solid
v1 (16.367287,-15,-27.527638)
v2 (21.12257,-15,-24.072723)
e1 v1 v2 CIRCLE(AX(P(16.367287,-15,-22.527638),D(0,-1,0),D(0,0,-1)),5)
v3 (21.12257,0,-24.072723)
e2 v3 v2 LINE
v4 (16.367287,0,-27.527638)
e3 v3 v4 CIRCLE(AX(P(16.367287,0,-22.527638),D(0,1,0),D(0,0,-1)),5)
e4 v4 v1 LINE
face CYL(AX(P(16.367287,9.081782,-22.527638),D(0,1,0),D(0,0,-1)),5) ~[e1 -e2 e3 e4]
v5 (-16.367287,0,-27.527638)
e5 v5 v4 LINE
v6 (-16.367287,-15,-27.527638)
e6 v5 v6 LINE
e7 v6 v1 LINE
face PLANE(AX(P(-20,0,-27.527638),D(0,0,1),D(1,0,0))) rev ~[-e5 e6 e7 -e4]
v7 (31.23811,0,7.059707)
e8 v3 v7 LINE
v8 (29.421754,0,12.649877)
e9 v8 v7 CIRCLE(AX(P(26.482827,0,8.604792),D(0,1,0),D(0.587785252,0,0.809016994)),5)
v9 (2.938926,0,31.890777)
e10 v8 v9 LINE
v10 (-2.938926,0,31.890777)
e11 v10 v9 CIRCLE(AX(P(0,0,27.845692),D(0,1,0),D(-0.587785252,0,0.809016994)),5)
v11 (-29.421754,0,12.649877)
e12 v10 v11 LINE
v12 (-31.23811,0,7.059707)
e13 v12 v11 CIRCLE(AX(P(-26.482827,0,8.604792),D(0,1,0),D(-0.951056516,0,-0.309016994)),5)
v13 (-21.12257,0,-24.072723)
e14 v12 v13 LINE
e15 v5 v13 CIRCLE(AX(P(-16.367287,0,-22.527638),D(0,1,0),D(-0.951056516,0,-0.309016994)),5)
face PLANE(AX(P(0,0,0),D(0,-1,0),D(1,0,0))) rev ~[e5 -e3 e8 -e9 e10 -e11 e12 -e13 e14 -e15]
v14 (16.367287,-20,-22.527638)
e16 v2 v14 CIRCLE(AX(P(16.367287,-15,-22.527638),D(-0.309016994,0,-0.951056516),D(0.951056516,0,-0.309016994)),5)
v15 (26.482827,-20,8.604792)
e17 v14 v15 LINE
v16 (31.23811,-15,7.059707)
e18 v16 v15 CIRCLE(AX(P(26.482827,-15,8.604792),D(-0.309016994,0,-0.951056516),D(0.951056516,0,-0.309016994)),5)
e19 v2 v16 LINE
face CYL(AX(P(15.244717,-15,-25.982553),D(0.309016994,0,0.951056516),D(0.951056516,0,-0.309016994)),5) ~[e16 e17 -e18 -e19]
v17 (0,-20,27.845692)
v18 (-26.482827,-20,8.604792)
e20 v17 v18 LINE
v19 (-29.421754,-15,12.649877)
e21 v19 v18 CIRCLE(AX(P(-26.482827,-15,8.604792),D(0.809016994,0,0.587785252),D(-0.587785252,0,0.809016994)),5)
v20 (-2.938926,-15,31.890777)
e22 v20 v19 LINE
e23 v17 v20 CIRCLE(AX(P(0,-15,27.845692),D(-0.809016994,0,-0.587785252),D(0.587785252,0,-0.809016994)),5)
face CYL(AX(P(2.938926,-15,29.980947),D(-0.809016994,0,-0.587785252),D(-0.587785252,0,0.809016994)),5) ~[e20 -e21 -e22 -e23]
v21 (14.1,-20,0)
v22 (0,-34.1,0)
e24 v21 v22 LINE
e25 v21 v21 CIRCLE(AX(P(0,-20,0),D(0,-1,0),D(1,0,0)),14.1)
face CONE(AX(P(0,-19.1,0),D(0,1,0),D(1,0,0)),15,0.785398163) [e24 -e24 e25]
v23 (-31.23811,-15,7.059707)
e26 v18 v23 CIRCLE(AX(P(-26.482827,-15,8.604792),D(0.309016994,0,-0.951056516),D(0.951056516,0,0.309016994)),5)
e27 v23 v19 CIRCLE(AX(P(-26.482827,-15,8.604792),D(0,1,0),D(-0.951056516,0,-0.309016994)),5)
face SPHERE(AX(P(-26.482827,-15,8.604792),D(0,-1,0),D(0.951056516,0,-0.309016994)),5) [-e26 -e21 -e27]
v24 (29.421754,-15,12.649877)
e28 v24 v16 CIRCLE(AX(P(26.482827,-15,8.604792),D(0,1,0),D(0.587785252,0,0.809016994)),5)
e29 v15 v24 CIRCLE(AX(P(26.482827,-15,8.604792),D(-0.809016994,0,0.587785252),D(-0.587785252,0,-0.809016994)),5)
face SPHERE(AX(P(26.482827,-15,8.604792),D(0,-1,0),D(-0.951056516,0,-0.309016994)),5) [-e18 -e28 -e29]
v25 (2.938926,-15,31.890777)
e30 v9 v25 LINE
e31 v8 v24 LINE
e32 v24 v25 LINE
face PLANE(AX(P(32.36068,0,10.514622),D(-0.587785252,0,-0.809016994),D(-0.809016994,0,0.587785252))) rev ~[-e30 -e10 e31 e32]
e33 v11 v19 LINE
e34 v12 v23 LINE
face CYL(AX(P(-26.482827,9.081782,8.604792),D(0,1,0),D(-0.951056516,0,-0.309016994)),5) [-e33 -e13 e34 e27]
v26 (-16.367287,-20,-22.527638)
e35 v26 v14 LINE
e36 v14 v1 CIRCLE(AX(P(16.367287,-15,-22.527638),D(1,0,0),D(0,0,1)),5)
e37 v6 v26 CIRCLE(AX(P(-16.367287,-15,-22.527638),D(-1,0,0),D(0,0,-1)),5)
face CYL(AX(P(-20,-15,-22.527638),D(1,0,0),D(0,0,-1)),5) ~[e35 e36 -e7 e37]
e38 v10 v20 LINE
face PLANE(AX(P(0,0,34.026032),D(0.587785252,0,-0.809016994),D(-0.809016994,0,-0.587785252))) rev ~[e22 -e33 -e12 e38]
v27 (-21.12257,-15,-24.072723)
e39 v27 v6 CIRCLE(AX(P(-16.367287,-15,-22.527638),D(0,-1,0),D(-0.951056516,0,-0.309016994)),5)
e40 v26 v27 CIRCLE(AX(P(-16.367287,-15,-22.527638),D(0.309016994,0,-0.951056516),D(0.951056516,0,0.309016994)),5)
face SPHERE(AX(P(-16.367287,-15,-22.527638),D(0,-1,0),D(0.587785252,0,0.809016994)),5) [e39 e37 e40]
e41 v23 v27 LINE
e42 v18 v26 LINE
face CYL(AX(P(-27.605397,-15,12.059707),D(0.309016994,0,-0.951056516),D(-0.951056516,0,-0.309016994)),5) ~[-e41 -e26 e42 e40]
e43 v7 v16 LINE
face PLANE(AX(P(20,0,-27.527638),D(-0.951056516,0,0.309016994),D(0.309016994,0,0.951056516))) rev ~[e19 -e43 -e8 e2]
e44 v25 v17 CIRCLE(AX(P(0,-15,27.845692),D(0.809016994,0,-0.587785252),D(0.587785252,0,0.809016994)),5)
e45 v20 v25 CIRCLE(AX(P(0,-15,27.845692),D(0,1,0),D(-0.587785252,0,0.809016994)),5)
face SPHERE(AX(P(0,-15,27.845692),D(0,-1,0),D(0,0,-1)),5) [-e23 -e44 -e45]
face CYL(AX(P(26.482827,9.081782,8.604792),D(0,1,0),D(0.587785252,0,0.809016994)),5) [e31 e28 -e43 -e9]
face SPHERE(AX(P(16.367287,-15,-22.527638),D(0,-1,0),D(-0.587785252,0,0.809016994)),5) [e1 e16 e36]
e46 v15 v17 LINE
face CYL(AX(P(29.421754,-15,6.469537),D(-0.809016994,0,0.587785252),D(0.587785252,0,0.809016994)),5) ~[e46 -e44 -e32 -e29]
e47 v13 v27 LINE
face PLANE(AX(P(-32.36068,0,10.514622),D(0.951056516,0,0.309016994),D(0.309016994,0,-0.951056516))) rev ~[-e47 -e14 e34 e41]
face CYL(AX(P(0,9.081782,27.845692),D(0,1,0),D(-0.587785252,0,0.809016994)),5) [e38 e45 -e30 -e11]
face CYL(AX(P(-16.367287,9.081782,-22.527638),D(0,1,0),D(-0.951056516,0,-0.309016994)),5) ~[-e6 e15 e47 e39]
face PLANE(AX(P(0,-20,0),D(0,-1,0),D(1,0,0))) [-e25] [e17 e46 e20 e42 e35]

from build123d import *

# Parameters (mm, degrees)
F0_R         = 15
F1_DEPTH     = 20
F2_R         = 5
F3_T1_DEPTH  = 24.0817816001
F3_T6_DEPTH  = 5
F3_T12_DEPTH = 5
F3_T18_DEPTH = 5
F3_T24_DEPTH = 5
F3_T30_DEPTH = 5
F4_DEPTH     = 34.1


# Not quite as in the source:
# - a fillet or chamfer that OpenCascade refuses, or shapes differently, is made with other operations: its cross-section is extruded or revolved along the edge and cut away or added


with BuildPart() as f1:
    # F0 (on Front) → F1 (new body)
    with BuildSketch(Plane.XZ):
        Polygon((-20, -27.5276384094), (20, -27.5276384094), (32.360679775, 10.5146222424), (0, 34.0260323341), (-32.360679775, 10.5146222424), align=None)
        Circle(F0_R, mode=Mode.SUBTRACT)
    extrude(amount=F1_DEPTH)

    # F2
    f2_edges = [f1.edges().sort_by_distance(p)[0] for p in [
        (-26.18034, -20, -8.506508),
        (0, -20, -27.527638),
        (26.18034, -20, -8.506508),
        (16.18034, -20, 22.270327),
        (-16.18034, -20, 22.270327),
    ]]
    fillet(f2_edges, radius=F2_R)

    # F3: fillet of radius 5 on 5 edges, made by hand

    # F3_s2 → F3_t1 (cut)
    with BuildSketch(Plane.XZ.offset(-9.0817816001)):
        with BuildLine():
            ThreePointArc((16.36728736, -27.5276384094), (19.3062136214, -26.5727233813), (21.1225699414, -24.0727233813))
            Line((21.1225699414, -24.0727233813), (20, -27.5276384094))
            Line((20, -27.5276384094), (16.36728736, -27.5276384094))
        make_face()
        with BuildLine():
            ThreePointArc((29.4217535135, 12.649877158), (31.2381098335, 10.149877158), (31.2381098335, 7.0597072143))
            Line((31.2381098335, 7.0597072143), (32.360679775, 10.5146222424))
            Line((32.360679775, 10.5146222424), (29.4217535135, 12.649877158))
        make_face()
        with BuildLine():
            ThreePointArc((-2.9389262615, 31.8907774185), (0, 32.8456924466), (2.9389262615, 31.8907774185))
            Line((2.9389262615, 31.8907774185), (0, 34.0260323341))
            Line((0, 34.0260323341), (-2.9389262615, 31.8907774185))
        make_face()
        with BuildLine():
            ThreePointArc((-31.2381098335, 7.0597072143), (-31.2381098335, 10.149877158), (-29.4217535135, 12.649877158))
            Line((-29.4217535135, 12.649877158), (-32.360679775, 10.5146222424))
            Line((-32.360679775, 10.5146222424), (-31.2381098335, 7.0597072143))
        make_face()
        with BuildLine():
            ThreePointArc((-21.1225699414, -24.0727233813), (-19.3062136214, -26.5727233813), (-16.36728736, -27.5276384094))
            Line((-16.36728736, -27.5276384094), (-20, -27.5276384094))
            Line((-20, -27.5276384094), (-21.1225699414, -24.0727233813))
        make_face()
    extrude(amount=F3_T1_DEPTH, mode=Mode.SUBTRACT)


with BuildPart() as f3_tool4:
    # F3_s5 → F3_t6 (new body)
    with BuildSketch(Plane.XZ.offset(15)):
        Polygon((-16.36728736, -22.5276384094), (-21.1225699414, -24.0727233813), (-20, -27.5276384094), (-16.36728736, -27.5276384094), align=None)
    extrude(amount=F3_T6_DEPTH)

    # F3_s7 → F3_t8 (revolve, cut)
    with BuildSketch(Plane(origin=(-16.36728736, -15, -22.5276384094), x_dir=(0.5877852523, 0, 0.8090169944), z_dir=(0.8090169944, 0, -0.5877852523))):
        with BuildLine():
            ThreePointArc((0, -5), (5, 0), (0, 5))
            Line((0, 5), (0, -5))
        make_face()
    revolve(axis=Axis((-16.36728736, -15, -22.5276384094), (0, -1, 0)), mode=Mode.SUBTRACT)


with BuildPart() as f1_1:
    add(f1.part)

    # F3_t3: cut F3_tool4
    add(f3_tool4.part, mode=Mode.SUBTRACT)


with BuildPart() as f3_tool10:
    # F3_s11 → F3_t12 (new body)
    with BuildSketch(Plane.XZ.offset(15)):
        Polygon((-26.4828272521, 8.6047921861), (-31.2381098335, 7.0597072143), (-32.360679775, 10.5146222424), (-29.4217535135, 12.649877158), align=None)
    extrude(amount=F3_T12_DEPTH)

    # F3_s13 → F3_t14 (revolve, cut)
    with BuildSketch(Plane(origin=(-26.4828272521, -15, 8.6047921861), x_dir=(0.9510565163, 0, -0.3090169944), z_dir=(-0.3090169944, 0, -0.9510565163))):
        with BuildLine():
            ThreePointArc((0, -5), (5, 0), (0, 5))
            Line((0, 5), (0, -5))
        make_face()
    revolve(axis=Axis((-26.4828272521, -15, 8.6047921861), (0, -1, 0)), mode=Mode.SUBTRACT)


with BuildPart() as f1_2:
    add(f1_1.part)

    # F3_t9: cut F3_tool10
    add(f3_tool10.part, mode=Mode.SUBTRACT)


with BuildPart() as f3_tool16:
    # F3_s17 → F3_t18 (new body)
    with BuildSketch(Plane.XZ.offset(15)):
        Polygon((0, 27.8456924466), (-2.9389262615, 31.8907774185), (0, 34.0260323341), (2.9389262615, 31.8907774185), align=None)
    extrude(amount=F3_T18_DEPTH)

    # F3_s19 → F3_t20 (revolve, cut)
    with BuildSketch(Plane(origin=(0, -15, 27.8456924466), x_dir=(0, 0, -1), z_dir=(-1, 0, 0))):
        with BuildLine():
            ThreePointArc((0, -5), (5, 0), (0, 5))
            Line((0, 5), (0, -5))
        make_face()
    revolve(axis=Axis((0, -15, 27.8456924466), (0, -1, 0)), mode=Mode.SUBTRACT)


with BuildPart() as f1_3:
    add(f1_2.part)

    # F3_t15: cut F3_tool16
    add(f3_tool16.part, mode=Mode.SUBTRACT)


with BuildPart() as f3_tool22:
    # F3_s23 → F3_t24 (new body)
    with BuildSketch(Plane.XZ.offset(15)):
        Polygon((26.4828272521, 8.6047921861), (29.4217535135, 12.649877158), (32.360679775, 10.5146222424), (31.2381098335, 7.0597072143), align=None)
    extrude(amount=F3_T24_DEPTH)

    # F3_s25 → F3_t26 (revolve, cut)
    with BuildSketch(Plane(origin=(26.4828272521, -15, 8.6047921861), x_dir=(-0.9510565163, 0, -0.3090169944), z_dir=(-0.3090169944, 0, 0.9510565163))):
        with BuildLine():
            ThreePointArc((0, -5), (5, 0), (0, 5))
            Line((0, 5), (0, -5))
        make_face()
    revolve(axis=Axis((26.4828272521, -15, 8.6047921861), (0, -1, 0)), mode=Mode.SUBTRACT)


with BuildPart() as f1_4:
    add(f1_3.part)

    # F3_t21: cut F3_tool22
    add(f3_tool22.part, mode=Mode.SUBTRACT)


with BuildPart() as f3_tool28:
    # F3_s29 → F3_t30 (new body)
    with BuildSketch(Plane.XZ.offset(15)):
        Polygon((16.36728736, -22.5276384094), (16.36728736, -27.5276384094), (20, -27.5276384094), (21.1225699414, -24.0727233813), align=None)
    extrude(amount=F3_T30_DEPTH)

    # F3_s31 → F3_t32 (revolve, cut)
    with BuildSketch(Plane(origin=(16.36728736, -15, -22.5276384094), x_dir=(-0.5877852523, 0, 0.8090169944), z_dir=(0.8090169944, 0, 0.5877852523))):
        with BuildLine():
            ThreePointArc((0, -5), (5, 0), (0, 5))
            Line((0, 5), (0, -5))
        make_face()
    revolve(axis=Axis((16.36728736, -15, -22.5276384094), (0, -1, 0)), mode=Mode.SUBTRACT)


with BuildPart() as f1_5:
    add(f1_4.part)

    # F3_t27: cut F3_tool28
    add(f3_tool28.part, mode=Mode.SUBTRACT)

    # F0 (on Front) → F4 (join)
    with BuildSketch(Plane.XZ):
        Circle(F0_R)
    extrude(amount=F4_DEPTH)

    # F5: chamfer of 15 on 1 edges, made by hand


with BuildPart() as f5_tool2:
    # F5_s3 → F5_t4 (revolve)
    with BuildSketch(Plane.XY):
        Polygon((15, -19.1), (0, -34.1), (15, -34.1), align=None)
    revolve(axis=Axis((0, -34.1, 0), (0, -1, 0)))

    split(bisect_by=Plane.XZ.offset(20), keep=Keep.TOP)


with BuildPart() as f1_6:
    add(f1_5.part)

    # F5_t1: cut F5_tool2
    add(f5_tool2.part, mode=Mode.SUBTRACT)


solid = f1_6.part
